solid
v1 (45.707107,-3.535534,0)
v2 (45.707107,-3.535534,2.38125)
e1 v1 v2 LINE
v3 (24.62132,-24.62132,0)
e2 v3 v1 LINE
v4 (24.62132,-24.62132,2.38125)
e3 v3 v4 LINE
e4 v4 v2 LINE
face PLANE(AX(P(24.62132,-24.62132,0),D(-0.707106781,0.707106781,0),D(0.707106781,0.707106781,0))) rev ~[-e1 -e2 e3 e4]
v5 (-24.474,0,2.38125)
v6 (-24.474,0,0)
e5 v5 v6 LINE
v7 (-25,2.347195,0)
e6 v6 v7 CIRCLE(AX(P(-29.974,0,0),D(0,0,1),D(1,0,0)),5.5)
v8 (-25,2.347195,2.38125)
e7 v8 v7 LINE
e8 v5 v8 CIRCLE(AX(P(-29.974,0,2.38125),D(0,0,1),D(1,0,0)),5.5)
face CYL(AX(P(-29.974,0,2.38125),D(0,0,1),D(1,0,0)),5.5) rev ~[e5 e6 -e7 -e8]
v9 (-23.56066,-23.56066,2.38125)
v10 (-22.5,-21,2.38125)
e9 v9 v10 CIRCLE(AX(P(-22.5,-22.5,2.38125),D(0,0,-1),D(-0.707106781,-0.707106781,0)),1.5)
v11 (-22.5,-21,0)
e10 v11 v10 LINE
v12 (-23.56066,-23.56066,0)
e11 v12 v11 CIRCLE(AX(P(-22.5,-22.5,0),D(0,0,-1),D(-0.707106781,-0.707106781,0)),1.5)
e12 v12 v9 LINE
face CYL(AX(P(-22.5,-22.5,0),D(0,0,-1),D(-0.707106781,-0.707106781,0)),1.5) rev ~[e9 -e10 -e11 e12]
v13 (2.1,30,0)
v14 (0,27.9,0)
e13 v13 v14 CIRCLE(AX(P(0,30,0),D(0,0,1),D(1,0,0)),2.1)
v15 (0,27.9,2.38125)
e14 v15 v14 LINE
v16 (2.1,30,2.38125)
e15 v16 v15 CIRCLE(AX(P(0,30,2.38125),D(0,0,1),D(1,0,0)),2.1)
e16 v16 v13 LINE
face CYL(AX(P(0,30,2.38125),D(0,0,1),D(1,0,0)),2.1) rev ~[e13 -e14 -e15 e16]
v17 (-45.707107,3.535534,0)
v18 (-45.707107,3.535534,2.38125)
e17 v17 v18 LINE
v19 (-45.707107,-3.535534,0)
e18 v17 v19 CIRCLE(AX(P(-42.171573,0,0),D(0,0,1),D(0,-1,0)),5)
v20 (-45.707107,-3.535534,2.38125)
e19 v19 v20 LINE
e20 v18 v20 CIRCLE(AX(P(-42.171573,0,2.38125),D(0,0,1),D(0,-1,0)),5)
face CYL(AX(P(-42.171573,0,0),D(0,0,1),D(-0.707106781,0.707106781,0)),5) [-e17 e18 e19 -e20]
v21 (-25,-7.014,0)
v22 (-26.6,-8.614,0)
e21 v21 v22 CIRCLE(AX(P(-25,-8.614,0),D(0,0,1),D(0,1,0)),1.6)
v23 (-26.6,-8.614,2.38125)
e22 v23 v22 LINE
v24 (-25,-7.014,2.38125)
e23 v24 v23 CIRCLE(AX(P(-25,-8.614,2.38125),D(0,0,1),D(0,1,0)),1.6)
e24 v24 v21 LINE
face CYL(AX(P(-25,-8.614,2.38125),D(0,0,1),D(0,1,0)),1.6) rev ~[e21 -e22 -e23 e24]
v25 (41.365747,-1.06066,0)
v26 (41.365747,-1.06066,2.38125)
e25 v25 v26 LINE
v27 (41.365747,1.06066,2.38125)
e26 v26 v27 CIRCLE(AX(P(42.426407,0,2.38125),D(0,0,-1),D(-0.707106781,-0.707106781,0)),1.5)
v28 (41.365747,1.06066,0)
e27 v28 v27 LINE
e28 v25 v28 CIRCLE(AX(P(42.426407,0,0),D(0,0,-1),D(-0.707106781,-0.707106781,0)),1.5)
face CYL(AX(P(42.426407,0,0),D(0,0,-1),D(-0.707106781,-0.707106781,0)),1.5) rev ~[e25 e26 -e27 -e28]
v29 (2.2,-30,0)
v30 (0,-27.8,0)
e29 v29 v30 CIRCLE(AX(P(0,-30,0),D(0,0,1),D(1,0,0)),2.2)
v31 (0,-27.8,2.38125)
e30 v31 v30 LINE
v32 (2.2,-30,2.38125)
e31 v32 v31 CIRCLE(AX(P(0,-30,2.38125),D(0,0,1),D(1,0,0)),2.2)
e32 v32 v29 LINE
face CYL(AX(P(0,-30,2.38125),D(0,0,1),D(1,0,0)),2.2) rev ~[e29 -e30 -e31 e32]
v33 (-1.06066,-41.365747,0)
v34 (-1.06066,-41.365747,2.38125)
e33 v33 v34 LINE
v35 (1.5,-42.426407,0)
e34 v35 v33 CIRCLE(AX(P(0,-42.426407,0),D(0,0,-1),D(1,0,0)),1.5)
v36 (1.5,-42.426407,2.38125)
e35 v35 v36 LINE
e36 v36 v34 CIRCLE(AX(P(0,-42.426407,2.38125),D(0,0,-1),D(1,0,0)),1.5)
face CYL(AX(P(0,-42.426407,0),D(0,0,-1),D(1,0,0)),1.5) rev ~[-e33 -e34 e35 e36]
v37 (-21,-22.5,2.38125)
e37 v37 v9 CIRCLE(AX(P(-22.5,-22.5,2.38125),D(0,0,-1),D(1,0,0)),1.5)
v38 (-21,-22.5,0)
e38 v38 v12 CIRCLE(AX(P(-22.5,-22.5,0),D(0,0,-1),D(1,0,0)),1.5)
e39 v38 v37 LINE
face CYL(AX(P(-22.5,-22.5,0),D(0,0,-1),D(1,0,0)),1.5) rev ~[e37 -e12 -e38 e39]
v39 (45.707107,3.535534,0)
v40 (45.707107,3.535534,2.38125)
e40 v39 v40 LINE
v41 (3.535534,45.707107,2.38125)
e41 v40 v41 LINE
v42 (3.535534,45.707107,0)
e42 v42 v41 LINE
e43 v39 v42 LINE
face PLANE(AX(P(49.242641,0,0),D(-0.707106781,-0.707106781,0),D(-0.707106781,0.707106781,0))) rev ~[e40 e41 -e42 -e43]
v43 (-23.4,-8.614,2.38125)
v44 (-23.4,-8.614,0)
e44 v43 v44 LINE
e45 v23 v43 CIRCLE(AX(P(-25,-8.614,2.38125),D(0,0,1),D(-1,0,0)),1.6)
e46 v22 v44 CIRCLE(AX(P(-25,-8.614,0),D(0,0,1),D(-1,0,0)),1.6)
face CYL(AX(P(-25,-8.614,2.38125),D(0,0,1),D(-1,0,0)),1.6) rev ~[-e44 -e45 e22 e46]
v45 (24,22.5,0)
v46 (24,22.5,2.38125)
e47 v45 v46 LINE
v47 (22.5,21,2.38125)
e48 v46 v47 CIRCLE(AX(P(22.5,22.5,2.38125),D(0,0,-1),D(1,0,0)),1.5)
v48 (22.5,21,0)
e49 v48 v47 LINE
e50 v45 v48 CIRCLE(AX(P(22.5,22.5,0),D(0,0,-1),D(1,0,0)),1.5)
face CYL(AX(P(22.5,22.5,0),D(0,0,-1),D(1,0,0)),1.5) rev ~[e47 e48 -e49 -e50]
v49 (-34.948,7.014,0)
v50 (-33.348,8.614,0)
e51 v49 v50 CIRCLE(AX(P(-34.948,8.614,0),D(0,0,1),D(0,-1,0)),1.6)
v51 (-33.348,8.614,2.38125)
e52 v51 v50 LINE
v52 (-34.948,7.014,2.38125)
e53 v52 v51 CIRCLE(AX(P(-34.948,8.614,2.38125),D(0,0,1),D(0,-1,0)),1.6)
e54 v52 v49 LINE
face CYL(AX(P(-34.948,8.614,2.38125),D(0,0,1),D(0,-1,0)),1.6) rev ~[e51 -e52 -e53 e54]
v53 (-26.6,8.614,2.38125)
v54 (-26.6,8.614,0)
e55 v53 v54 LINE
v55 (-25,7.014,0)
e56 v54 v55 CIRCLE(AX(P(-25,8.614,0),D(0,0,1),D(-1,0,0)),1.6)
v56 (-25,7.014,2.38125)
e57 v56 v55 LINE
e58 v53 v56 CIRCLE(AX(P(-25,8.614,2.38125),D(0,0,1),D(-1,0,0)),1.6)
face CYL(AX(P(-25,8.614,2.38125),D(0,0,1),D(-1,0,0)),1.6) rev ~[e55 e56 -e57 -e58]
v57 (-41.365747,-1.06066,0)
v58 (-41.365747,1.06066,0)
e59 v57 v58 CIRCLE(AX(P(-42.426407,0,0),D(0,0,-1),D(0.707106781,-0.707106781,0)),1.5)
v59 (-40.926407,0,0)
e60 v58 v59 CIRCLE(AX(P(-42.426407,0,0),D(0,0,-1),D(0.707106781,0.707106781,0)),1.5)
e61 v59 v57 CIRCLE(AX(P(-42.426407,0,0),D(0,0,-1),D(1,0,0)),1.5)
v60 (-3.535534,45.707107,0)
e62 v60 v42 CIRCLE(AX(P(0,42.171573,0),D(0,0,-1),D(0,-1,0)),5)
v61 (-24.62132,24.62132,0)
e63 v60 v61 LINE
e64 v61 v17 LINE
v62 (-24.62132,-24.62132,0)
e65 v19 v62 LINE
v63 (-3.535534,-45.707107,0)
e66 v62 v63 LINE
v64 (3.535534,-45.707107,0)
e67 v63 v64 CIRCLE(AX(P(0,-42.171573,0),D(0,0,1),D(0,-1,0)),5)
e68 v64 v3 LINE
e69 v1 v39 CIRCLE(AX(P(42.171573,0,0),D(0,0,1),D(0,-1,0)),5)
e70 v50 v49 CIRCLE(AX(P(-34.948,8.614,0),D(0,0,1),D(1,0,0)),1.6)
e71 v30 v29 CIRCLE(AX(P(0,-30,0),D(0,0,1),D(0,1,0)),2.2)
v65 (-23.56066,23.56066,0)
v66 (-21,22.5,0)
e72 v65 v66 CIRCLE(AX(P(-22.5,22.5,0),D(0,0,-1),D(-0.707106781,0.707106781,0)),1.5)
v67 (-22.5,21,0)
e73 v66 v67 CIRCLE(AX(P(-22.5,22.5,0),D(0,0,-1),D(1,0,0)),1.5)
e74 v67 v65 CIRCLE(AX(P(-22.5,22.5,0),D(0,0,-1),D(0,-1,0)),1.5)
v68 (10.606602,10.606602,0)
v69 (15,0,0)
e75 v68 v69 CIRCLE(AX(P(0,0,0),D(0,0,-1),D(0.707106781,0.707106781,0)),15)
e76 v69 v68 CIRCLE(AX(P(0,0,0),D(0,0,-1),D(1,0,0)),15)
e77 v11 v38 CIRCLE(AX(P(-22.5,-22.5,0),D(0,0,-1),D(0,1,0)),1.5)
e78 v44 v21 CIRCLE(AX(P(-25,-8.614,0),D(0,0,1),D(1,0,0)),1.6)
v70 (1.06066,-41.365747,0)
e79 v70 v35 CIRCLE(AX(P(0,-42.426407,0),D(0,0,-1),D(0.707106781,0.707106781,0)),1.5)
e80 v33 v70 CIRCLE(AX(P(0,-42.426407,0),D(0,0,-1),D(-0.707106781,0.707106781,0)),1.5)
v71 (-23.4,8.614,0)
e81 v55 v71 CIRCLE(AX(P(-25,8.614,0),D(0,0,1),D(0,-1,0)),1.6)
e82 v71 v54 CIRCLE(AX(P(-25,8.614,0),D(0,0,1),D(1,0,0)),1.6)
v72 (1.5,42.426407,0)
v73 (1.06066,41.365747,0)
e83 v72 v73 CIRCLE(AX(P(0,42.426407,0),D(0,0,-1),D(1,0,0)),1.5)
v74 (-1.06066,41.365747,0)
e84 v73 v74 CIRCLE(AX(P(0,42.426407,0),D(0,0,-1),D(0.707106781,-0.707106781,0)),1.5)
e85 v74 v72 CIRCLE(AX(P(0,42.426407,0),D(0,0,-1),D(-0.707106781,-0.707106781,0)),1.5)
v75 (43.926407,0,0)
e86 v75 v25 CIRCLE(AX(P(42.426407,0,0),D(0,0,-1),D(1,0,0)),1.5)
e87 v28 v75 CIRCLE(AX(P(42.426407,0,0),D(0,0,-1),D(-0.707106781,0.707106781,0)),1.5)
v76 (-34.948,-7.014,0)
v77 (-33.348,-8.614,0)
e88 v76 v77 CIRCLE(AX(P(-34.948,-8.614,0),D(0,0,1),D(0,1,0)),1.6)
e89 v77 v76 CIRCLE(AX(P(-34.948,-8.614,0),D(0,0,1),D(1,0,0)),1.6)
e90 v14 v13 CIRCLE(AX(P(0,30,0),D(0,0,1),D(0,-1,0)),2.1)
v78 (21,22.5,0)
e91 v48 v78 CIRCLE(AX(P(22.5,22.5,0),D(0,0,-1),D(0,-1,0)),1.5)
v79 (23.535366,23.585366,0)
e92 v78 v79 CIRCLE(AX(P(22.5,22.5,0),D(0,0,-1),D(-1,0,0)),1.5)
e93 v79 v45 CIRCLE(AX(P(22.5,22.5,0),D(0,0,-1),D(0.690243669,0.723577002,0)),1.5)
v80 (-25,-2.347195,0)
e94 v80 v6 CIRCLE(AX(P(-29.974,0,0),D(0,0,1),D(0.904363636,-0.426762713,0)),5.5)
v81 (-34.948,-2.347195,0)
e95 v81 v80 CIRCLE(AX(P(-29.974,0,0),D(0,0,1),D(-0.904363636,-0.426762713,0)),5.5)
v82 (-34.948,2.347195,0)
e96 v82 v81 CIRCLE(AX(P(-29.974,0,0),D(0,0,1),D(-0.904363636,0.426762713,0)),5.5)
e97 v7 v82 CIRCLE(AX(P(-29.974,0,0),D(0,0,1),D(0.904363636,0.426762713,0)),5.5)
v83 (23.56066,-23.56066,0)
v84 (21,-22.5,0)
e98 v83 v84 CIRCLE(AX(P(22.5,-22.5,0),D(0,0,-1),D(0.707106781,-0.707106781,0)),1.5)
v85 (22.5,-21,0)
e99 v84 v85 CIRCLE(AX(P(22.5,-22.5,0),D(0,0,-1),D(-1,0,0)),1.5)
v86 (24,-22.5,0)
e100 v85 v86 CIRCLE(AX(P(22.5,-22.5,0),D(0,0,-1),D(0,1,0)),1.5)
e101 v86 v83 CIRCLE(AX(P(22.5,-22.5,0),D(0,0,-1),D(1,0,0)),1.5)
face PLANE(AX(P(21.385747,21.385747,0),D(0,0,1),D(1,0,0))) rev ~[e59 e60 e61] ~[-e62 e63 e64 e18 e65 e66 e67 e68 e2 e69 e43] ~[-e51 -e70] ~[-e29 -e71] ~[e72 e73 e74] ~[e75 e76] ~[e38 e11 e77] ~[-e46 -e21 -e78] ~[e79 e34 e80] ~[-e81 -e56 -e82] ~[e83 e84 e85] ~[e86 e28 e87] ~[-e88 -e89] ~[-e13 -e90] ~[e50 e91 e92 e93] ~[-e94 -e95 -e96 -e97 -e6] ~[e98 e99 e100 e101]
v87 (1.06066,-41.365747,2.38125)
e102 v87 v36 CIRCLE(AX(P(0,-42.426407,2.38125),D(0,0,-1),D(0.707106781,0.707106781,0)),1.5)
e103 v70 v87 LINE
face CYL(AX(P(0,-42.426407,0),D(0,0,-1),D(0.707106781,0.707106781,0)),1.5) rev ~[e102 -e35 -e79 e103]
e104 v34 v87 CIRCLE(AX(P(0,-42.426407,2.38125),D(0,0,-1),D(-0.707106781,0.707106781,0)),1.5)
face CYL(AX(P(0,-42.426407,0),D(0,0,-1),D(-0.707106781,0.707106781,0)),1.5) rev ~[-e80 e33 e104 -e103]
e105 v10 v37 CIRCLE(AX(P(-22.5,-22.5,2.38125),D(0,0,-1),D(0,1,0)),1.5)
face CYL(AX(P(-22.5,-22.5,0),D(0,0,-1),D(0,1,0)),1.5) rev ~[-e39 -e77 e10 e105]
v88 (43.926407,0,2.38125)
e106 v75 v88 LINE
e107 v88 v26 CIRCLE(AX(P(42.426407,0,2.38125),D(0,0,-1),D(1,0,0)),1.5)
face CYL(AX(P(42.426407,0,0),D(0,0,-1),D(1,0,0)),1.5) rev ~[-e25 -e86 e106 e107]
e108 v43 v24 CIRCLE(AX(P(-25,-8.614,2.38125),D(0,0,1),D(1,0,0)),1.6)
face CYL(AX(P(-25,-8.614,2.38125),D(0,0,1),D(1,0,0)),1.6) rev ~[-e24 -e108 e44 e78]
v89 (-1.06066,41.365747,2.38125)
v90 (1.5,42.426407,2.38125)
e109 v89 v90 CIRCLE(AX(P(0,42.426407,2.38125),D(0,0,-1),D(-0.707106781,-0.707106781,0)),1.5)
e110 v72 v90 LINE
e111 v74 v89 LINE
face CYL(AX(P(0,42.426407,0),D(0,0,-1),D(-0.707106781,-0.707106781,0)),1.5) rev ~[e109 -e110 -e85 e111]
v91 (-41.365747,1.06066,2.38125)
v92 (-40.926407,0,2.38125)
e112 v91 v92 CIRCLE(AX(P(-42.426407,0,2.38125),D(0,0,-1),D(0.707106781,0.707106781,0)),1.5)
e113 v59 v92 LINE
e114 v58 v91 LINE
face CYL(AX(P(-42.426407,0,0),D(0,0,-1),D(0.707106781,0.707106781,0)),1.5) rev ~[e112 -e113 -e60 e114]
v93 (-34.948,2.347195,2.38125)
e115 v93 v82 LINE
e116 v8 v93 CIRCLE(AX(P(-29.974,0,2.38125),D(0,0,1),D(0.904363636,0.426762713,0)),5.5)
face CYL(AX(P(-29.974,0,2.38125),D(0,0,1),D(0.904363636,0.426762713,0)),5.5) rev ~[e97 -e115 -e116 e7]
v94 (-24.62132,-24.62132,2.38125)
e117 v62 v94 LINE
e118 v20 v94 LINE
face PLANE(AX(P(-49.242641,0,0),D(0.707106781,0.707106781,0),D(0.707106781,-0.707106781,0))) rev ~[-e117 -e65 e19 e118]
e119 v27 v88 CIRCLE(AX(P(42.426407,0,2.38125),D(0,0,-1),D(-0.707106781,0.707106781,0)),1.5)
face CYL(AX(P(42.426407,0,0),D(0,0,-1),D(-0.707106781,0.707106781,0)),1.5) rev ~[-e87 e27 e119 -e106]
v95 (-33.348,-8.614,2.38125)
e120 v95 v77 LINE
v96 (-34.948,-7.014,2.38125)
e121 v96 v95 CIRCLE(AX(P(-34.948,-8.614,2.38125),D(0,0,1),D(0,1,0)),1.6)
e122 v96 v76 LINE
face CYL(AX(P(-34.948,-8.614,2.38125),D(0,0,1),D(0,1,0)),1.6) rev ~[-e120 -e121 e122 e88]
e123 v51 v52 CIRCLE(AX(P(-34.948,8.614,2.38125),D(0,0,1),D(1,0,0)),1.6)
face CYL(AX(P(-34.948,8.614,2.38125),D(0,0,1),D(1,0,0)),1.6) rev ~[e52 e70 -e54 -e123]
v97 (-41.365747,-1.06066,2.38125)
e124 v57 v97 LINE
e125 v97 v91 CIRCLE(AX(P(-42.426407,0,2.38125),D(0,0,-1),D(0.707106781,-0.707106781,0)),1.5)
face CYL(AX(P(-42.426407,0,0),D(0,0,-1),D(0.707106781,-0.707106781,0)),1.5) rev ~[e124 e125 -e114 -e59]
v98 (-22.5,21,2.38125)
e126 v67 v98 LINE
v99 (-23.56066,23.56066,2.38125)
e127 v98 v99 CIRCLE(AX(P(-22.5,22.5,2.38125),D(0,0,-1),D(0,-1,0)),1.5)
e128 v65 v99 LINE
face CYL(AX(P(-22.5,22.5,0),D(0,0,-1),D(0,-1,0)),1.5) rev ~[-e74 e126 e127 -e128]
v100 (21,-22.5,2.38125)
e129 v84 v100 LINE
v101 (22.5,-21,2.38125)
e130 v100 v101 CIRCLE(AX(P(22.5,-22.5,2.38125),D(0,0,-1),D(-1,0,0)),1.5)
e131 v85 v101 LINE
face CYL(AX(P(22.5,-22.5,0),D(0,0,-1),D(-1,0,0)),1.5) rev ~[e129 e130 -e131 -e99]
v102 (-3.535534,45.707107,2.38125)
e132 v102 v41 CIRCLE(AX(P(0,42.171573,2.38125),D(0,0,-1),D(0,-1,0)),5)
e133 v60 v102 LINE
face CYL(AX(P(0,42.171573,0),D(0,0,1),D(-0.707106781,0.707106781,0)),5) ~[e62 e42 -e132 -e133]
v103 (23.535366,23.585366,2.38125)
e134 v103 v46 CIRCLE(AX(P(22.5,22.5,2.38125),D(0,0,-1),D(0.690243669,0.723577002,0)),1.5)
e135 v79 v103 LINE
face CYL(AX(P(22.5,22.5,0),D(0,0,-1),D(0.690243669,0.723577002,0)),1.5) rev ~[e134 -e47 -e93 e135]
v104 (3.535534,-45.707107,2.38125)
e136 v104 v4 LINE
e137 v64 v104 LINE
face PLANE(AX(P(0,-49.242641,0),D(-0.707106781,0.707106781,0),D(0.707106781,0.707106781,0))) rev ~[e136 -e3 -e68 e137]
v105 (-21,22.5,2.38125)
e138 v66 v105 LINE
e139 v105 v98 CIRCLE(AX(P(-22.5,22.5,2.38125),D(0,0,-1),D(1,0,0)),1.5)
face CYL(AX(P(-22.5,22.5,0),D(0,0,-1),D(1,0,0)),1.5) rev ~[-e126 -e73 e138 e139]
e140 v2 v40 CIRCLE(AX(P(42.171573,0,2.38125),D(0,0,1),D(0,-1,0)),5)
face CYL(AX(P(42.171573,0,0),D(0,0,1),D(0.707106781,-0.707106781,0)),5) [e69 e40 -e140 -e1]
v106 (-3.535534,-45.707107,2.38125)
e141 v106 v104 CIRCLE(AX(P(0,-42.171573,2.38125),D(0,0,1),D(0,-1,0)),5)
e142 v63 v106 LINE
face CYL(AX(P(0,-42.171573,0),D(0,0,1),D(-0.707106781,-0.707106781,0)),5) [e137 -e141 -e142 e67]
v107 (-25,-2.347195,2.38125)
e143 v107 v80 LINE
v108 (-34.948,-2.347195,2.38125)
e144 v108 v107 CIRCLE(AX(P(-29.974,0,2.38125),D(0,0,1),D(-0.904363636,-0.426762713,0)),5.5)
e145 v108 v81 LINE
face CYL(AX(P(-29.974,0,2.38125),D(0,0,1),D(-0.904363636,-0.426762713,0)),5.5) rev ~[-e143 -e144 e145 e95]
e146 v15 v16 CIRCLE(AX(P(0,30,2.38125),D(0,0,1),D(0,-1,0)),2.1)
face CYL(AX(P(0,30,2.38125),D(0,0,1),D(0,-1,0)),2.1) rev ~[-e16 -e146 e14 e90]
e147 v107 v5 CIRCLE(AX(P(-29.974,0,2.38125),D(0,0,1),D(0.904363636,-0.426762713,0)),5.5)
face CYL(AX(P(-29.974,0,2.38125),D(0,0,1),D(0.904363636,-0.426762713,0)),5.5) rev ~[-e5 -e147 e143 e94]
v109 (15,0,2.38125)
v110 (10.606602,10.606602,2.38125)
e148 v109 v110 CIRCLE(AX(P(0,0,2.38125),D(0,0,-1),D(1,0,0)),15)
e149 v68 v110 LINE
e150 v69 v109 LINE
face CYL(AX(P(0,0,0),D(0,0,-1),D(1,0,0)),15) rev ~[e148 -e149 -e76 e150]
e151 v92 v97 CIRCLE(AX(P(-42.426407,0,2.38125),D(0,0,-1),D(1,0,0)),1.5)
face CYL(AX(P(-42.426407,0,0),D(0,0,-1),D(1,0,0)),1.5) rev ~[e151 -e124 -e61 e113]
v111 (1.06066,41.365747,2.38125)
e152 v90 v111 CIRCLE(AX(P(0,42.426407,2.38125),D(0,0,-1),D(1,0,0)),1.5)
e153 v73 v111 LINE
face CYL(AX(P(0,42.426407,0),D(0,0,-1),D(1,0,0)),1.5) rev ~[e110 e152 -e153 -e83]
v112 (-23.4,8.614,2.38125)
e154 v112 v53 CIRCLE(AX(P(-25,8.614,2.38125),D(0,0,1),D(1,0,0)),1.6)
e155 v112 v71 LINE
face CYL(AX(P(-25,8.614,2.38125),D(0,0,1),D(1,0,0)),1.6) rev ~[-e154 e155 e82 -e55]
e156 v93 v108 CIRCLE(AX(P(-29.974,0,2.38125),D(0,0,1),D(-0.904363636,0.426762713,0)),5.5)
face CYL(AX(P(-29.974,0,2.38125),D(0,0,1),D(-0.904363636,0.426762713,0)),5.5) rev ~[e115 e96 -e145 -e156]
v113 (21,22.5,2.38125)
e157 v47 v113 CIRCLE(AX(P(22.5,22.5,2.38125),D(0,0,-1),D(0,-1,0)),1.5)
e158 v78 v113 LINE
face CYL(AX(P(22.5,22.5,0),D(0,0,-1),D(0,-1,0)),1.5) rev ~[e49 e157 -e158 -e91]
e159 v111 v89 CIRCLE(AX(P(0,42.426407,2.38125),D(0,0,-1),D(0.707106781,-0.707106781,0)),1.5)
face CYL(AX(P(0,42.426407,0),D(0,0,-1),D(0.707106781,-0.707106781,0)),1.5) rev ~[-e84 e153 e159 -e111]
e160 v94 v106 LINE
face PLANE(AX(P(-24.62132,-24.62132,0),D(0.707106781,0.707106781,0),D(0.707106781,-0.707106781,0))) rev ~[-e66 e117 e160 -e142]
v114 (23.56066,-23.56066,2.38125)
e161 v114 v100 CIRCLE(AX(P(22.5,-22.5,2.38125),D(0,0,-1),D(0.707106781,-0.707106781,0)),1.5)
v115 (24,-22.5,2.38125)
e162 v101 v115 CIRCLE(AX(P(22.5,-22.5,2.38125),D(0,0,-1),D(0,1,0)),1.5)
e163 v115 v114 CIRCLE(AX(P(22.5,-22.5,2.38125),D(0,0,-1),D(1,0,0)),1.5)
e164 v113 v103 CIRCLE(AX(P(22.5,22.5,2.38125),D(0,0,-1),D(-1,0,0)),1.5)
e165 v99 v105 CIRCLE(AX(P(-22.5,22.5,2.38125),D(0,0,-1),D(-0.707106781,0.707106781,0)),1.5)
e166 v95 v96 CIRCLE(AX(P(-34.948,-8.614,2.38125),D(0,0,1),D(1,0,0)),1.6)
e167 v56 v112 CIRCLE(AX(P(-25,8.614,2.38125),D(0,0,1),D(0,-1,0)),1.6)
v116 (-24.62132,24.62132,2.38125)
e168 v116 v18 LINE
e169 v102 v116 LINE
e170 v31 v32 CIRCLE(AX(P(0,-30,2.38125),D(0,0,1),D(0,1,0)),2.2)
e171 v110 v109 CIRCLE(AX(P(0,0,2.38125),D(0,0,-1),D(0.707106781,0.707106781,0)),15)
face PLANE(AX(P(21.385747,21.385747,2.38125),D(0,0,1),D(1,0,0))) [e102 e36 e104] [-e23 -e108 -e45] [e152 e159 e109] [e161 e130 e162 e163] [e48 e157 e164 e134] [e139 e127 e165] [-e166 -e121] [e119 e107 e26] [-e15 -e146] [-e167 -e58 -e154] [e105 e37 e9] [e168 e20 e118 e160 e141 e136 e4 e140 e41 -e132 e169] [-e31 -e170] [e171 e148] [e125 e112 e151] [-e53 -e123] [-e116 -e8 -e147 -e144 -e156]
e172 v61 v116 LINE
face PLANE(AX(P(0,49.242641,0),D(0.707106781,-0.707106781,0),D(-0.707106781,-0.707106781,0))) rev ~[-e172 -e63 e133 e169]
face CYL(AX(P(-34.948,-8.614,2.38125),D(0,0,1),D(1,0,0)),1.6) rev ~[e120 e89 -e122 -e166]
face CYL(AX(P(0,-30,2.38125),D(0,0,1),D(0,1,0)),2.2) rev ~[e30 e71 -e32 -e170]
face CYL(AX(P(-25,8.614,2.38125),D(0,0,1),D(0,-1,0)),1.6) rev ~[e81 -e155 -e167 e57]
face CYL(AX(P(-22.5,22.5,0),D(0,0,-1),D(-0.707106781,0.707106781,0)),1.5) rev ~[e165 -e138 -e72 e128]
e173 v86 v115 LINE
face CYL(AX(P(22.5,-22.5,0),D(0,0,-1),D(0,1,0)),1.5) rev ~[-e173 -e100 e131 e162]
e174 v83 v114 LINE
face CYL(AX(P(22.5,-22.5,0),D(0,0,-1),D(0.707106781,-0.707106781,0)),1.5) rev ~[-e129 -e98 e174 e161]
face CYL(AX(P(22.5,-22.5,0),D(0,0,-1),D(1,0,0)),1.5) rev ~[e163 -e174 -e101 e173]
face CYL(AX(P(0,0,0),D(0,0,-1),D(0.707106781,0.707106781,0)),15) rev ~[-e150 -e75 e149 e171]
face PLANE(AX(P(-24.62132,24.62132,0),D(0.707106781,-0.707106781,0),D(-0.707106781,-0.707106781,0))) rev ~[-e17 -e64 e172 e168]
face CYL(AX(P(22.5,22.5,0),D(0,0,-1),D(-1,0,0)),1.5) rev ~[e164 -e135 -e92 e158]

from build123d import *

# Parameters (mm, degrees)
F1_DEPTH = 2.38125
F2_R     = 5
F4_DEPTH = 25
F6_DEPTH = 25


# Not quite as in the source:
# - a feature names something its author has since deleted; it is built from what else it names


with BuildPart() as f1:
    # F0 (on Top) → F1 (new body)
    with BuildSketch(Plane.XY):
        with BuildLine():
            Line((19.9264068712, 22.5), (21.2132034356, 21.2132034356))
            Line((21.2132034356, 21.2132034356), (22.5, 19.9264068712))
            Line((22.5, 19.9264068712), (22.5, 21))
            ThreePointArc((22.5, 21), (21.4393398282, 21.4393398282), (21, 22.5))
            Line((21, 22.5), (19.9264068712, 22.5))
        make_face()
        with BuildLine():
            Line((-41.3657466994, 1.0606601718), (-22.5, 19.9264068712))
            Line((-22.5, 19.9264068712), (-22.5, 21))
            ThreePointArc((-22.5, 21), (-23.8858192988, 21.9259748515), (-23.5606601718, 23.5606601718))
            Line((-23.5606601718, 23.5606601718), (-24.6213203436, 24.6213203436))
            Line((-24.6213203436, 24.6213203436), (-49.2426406871, 0))
            Line((-49.2426406871, 0), (-24.6213203436, -24.6213203436))
            Line((-24.6213203436, -24.6213203436), (-23.5606601718, -23.5606601718))
            ThreePointArc((-23.5606601718, -23.5606601718), (-23.8858192988, -21.9259748515), (-22.5, -21))
            Line((-22.5, -21), (-22.5, -19.9264068712))
            Line((-22.5, -19.9264068712), (-41.3657466994, -1.0606601718))
            ThreePointArc((-41.3657466994, -1.0606601718), (-43.9264068712, 0), (-41.3657466994, 1.0606601718))
        make_face()
        with BuildLine():
            Line((21, -22.5), (19.9264068712, -22.5))
            Line((19.9264068712, -22.5), (1.0606601718, -41.3657466994))
            ThreePointArc((1.0606601718, -41.3657466994), (1.3858192988, -41.8523817226), (1.5, -42.4264068712))
            ThreePointArc((1.5, -42.4264068712), (-0.5740251485, -43.81222617), (-1.0606601718, -41.3657466994))
            Line((-1.0606601718, -41.3657466994), (-19.9264068712, -22.5))
            Line((-19.9264068712, -22.5), (-21, -22.5))
            ThreePointArc((-21, -22.5), (-21.9259748515, -23.8858192988), (-23.5606601718, -23.5606601718))
            Line((-23.5606601718, -23.5606601718), (-24.6213203436, -24.6213203436))
            Line((-24.6213203436, -24.6213203436), (0, -49.2426406871))
            Line((0, -49.2426406871), (24.6213203436, -24.6213203436))
            Line((24.6213203436, -24.6213203436), (23.5606601718, -23.5606601718))
            ThreePointArc((23.5606601718, -23.5606601718), (21.9259748515, -23.8858192988), (21, -22.5))
        make_face()
        with BuildLine():
            Line((22.5, 21), (22.5, 19.9264068712))
            Line((22.5, 19.9264068712), (41.3657466994, 1.0606601718))
            ThreePointArc((41.3657466994, 1.0606601718), (43.0004320197, 1.3858192988), (43.9264068712, 0))
            ThreePointArc((43.9264068712, 0), (43.0004320197, -1.3858192988), (41.3657466994, -1.0606601718))
            Line((41.3657466994, -1.0606601718), (22.5, -19.9264068712))
            Line((22.5, -19.9264068712), (22.5, -21))
            ThreePointArc((22.5, -21), (23.5606601718, -21.4393398282), (24, -22.5))
            ThreePointArc((24, -22.5), (23.8858192988, -23.0740251485), (23.5606601718, -23.5606601718))
            Line((23.5606601718, -23.5606601718), (24.6213203436, -24.6213203436))
            Line((24.6213203436, -24.6213203436), (49.2426406871, 0))
            Line((49.2426406871, 0), (0, 49.2426406871))
            Line((0, 49.2426406871), (-24.6213203436, 24.6213203436))
            Line((-24.6213203436, 24.6213203436), (-23.5606601718, 23.5606601718))
            ThreePointArc((-23.5606601718, 23.5606601718), (-21.9259748515, 23.8858192988), (-21, 22.5))
            Line((-21, 22.5), (-19.9264068712, 22.5))
            Line((-19.9264068712, 22.5), (-1.0606601718, 41.3657466994))
            ThreePointArc((-1.0606601718, 41.3657466994), (-0.5740251485, 43.81222617), (1.5, 42.4264068712))
            ThreePointArc((1.5, 42.4264068712), (1.3858192988, 41.8523817226), (1.0606601718, 41.3657466994))
            Line((1.0606601718, 41.3657466994), (19.9264068712, 22.5))
            Line((19.9264068712, 22.5), (21, 22.5))
            ThreePointArc((21, 22.5), (21.9096815497, 23.8789576234), (23.535365503, 23.585365503))
            ThreePointArc((23.535365503, 23.585365503), (23.8789576234, 23.0903184503), (24, 22.5))
            ThreePointArc((24, 22.5), (23.5606601718, 21.4393398282), (22.5, 21))
        make_face()
        with BuildLine():
            Line((-22.5, -19.9264068712), (-22.5, 19.9264068712))
            Line((-22.5, 19.9264068712), (-41.3657466994, 1.0606601718))
            ThreePointArc((-41.3657466994, 1.0606601718), (-41.0405875724, 0.5740251485), (-40.9264068712, 0))
            ThreePointArc((-40.9264068712, 0), (-41.0405875724, -0.5740251485), (-41.3657466994, -1.0606601718))
            Line((-41.3657466994, -1.0606601718), (-22.5, -19.9264068712))
        make_face()
        with BuildLine():
            Line((-19.9264068712, 22.5), (19.9264068712, 22.5))
            Line((19.9264068712, 22.5), (1.0606601718, 41.3657466994))
            ThreePointArc((1.0606601718, 41.3657466994), (0, 40.9264068712), (-1.0606601718, 41.3657466994))
            Line((-1.0606601718, 41.3657466994), (-19.9264068712, 22.5))
        make_face()
        with BuildLine():
            Line((22.5, 19.9264068712), (22.5, 0))
            Line((22.5, 0), (22.5, -19.9264068712))
            Line((22.5, -19.9264068712), (41.3657466994, -1.0606601718))
            ThreePointArc((41.3657466994, -1.0606601718), (40.9264068712, 0), (41.3657466994, 1.0606601718))
            Line((41.3657466994, 1.0606601718), (22.5, 19.9264068712))
        make_face()
        with BuildLine():
            Line((1.0606601718, -41.3657466994), (19.9264068712, -22.5))
            Line((19.9264068712, -22.5), (-19.9264068712, -22.5))
            Line((-19.9264068712, -22.5), (-1.0606601718, -41.3657466994))
            ThreePointArc((-1.0606601718, -41.3657466994), (0, -40.9264068712), (1.0606601718, -41.3657466994))
        make_face()
        with BuildLine():
            Line((22.5, 0), (15, 0))
            ThreePointArc((15, 0), (-13.8581929877, -5.7402514855), (10.6066017178, 10.6066017178))
            Line((10.6066017178, 10.6066017178), (21.2132034356, 21.2132034356))
            Line((21.2132034356, 21.2132034356), (19.9264068712, 22.5))
            Line((19.9264068712, 22.5), (-19.9264068712, 22.5))
            Line((-19.9264068712, 22.5), (-22.5, 19.9264068712))
            Line((-22.5, 19.9264068712), (-22.5, -19.9264068712))
            Line((-22.5, -19.9264068712), (-19.9264068712, -22.5))
            Line((-19.9264068712, -22.5), (19.9264068712, -22.5))
            Line((19.9264068712, -22.5), (22.5, -19.9264068712))
            Line((22.5, -19.9264068712), (22.5, 0))
        make_face()
        with BuildLine():
            ThreePointArc((10.6066017178, 10.6066017178), (13.8581929877, 5.7402514855), (15, 0))
            Line((15, 0), (22.5, 0))
            Line((22.5, 0), (22.5, 19.9264068712))
            Line((22.5, 19.9264068712), (21.2132034356, 21.2132034356))
            Line((21.2132034356, 21.2132034356), (10.6066017178, 10.6066017178))
        make_face()
        with BuildLine():
            Line((-21, -22.5), (-19.9264068712, -22.5))
            Line((-19.9264068712, -22.5), (-22.5, -19.9264068712))
            Line((-22.5, -19.9264068712), (-22.5, -21))
            ThreePointArc((-22.5, -21), (-21.4393398282, -21.4393398282), (-21, -22.5))
        make_face()
        with BuildLine():
            Line((-22.5, 19.9264068712), (-19.9264068712, 22.5))
            Line((-19.9264068712, 22.5), (-21, 22.5))
            ThreePointArc((-21, 22.5), (-21.4393398282, 21.4393398282), (-22.5, 21))
            Line((-22.5, 21), (-22.5, 19.9264068712))
        make_face()
        with BuildLine():
            Line((22.5, -21), (22.5, -19.9264068712))
            Line((22.5, -19.9264068712), (19.9264068712, -22.5))
            Line((19.9264068712, -22.5), (21, -22.5))
            ThreePointArc((21, -22.5), (21.4393398282, -21.4393398282), (22.5, -21))
        make_face()
    extrude(amount=F1_DEPTH)

    # F2
    f2_edges = [f1.edges().sort_by_distance(p)[0] for p in [
        (0, -49.242641, 1.190625),
        (49.242641, 0, 1.190625),
        (0, 49.242641, 1.190625),
        (-49.242641, 0, 1.190625),
    ]]
    fillet(f2_edges, radius=F2_R)

    # F3 (on face) → F4 (cut)
    with BuildSketch(Plane.XY.offset(2.38125)):
        with BuildLine():
            ThreePointArc((-25, -7.014), (-26.1313708499, -7.4826291501), (-26.6, -8.614))
            Line((-26.6, -8.614), (-25, -8.614))
            Line((-25, -8.614), (-25, -7.014))
        make_face()
        with BuildLine():
            Line((-25, -8.614), (-26.6, -8.614))
            ThreePointArc((-26.6, -8.614), (-25, -10.214), (-23.4, -8.614))
            ThreePointArc((-23.4, -8.614), (-23.8686291501, -7.4826291501), (-25, -7.014))
            Line((-25, -7.014), (-25, -8.614))
        make_face()
        with BuildLine():
            ThreePointArc((-34.948, -7.014), (-36.0793708499, -9.7453708499), (-33.348, -8.614))
            Line((-33.348, -8.614), (-34.948, -8.614))
            Line((-34.948, -8.614), (-34.948, -7.014))
        make_face()
        with BuildLine():
            Line((-34.948, -8.614), (-33.348, -8.614))
            ThreePointArc((-33.348, -8.614), (-33.8166291501, -7.4826291501), (-34.948, -7.014))
            Line((-34.948, -7.014), (-34.948, -8.614))
        make_face()
        with BuildLine():
            ThreePointArc((-34.948, -2.3471949216), (-29.974, -5.5), (-25, -2.3471949216))
            Line((-25, -2.3471949216), (-25, 0))
            Line((-25, 0), (-29.974, 0))
            Line((-29.974, 0), (-34.948, 0))
            Line((-34.948, 0), (-34.948, -2.3471949216))
        make_face()
        with BuildLine():
            Line((-25, 0), (-25, -2.3471949216))
            ThreePointArc((-25, -2.3471949216), (-24.6071107707, -1.2027052839), (-24.474, 0))
            Line((-24.474, 0), (-25, 0))
        make_face()
        with BuildLine():
            ThreePointArc((-34.948, 2.3471949216), (-35.474, 0), (-34.948, -2.3471949216))
            Line((-34.948, -2.3471949216), (-34.948, 0))
            Line((-34.948, 0), (-34.948, 2.3471949216))
        make_face()
        with BuildLine():
            Line((-29.974, 0), (-25, 0))
            Line((-25, 0), (-25, 2.3471949216))
            ThreePointArc((-25, 2.3471949216), (-29.974, 5.5), (-34.948, 2.3471949216))
            Line((-34.948, 2.3471949216), (-34.948, 0))
            Line((-34.948, 0), (-29.974, 0))
        make_face()
        with BuildLine():
            Line((-25, 2.3471949216), (-25, 0))
            Line((-25, 0), (-24.474, 0))
            ThreePointArc((-24.474, 0), (-24.6071107707, 1.2027052839), (-25, 2.3471949216))
        make_face()
        with BuildLine():
            Line((-34.948, 8.614), (-34.948, 7.014))
            ThreePointArc((-34.948, 7.014), (-33.8166291501, 7.4826291501), (-33.348, 8.614))
            Line((-33.348, 8.614), (-34.948, 8.614))
        make_face()
        with BuildLine():
            ThreePointArc((-33.348, 8.614), (-36.0793708499, 9.7453708499), (-34.948, 7.014))
            Line((-34.948, 7.014), (-34.948, 8.614))
            Line((-34.948, 8.614), (-33.348, 8.614))
        make_face()
        with BuildLine():
            ThreePointArc((-26.6, 8.614), (-26.1313708499, 7.4826291501), (-25, 7.014))
            Line((-25, 7.014), (-25, 8.614))
            Line((-25, 8.614), (-26.6, 8.614))
        make_face()
        with BuildLine():
            Line((-25, 8.614), (-25, 7.014))
            ThreePointArc((-25, 7.014), (-23.8686291501, 7.4826291501), (-23.4, 8.614))
            ThreePointArc((-23.4, 8.614), (-25, 10.214), (-26.6, 8.614))
            Line((-26.6, 8.614), (-25, 8.614))
        make_face()
    extrude(amount=-F4_DEPTH, mode=Mode.SUBTRACT)

    # F5 (on face) → F6 (cut)
    with BuildSketch(Plane.XY.offset(2.38125)):
        with BuildLine():
            ThreePointArc((2.2, -30), (1.5556349186, -28.4443650814), (0, -27.8))
            ThreePointArc((0, -27.8), (-1.5556349186, -31.5556349186), (2.2, -30))
        make_face()
        with BuildLine():
            ThreePointArc((2.1, 30), (-1.4849242405, 31.4849242405), (0, 27.9))
            ThreePointArc((0, 27.9), (1.4849242405, 28.5150757595), (2.1, 30))
        make_face()
    extrude(amount=-F6_DEPTH, mode=Mode.SUBTRACT)


solid = f1.part
